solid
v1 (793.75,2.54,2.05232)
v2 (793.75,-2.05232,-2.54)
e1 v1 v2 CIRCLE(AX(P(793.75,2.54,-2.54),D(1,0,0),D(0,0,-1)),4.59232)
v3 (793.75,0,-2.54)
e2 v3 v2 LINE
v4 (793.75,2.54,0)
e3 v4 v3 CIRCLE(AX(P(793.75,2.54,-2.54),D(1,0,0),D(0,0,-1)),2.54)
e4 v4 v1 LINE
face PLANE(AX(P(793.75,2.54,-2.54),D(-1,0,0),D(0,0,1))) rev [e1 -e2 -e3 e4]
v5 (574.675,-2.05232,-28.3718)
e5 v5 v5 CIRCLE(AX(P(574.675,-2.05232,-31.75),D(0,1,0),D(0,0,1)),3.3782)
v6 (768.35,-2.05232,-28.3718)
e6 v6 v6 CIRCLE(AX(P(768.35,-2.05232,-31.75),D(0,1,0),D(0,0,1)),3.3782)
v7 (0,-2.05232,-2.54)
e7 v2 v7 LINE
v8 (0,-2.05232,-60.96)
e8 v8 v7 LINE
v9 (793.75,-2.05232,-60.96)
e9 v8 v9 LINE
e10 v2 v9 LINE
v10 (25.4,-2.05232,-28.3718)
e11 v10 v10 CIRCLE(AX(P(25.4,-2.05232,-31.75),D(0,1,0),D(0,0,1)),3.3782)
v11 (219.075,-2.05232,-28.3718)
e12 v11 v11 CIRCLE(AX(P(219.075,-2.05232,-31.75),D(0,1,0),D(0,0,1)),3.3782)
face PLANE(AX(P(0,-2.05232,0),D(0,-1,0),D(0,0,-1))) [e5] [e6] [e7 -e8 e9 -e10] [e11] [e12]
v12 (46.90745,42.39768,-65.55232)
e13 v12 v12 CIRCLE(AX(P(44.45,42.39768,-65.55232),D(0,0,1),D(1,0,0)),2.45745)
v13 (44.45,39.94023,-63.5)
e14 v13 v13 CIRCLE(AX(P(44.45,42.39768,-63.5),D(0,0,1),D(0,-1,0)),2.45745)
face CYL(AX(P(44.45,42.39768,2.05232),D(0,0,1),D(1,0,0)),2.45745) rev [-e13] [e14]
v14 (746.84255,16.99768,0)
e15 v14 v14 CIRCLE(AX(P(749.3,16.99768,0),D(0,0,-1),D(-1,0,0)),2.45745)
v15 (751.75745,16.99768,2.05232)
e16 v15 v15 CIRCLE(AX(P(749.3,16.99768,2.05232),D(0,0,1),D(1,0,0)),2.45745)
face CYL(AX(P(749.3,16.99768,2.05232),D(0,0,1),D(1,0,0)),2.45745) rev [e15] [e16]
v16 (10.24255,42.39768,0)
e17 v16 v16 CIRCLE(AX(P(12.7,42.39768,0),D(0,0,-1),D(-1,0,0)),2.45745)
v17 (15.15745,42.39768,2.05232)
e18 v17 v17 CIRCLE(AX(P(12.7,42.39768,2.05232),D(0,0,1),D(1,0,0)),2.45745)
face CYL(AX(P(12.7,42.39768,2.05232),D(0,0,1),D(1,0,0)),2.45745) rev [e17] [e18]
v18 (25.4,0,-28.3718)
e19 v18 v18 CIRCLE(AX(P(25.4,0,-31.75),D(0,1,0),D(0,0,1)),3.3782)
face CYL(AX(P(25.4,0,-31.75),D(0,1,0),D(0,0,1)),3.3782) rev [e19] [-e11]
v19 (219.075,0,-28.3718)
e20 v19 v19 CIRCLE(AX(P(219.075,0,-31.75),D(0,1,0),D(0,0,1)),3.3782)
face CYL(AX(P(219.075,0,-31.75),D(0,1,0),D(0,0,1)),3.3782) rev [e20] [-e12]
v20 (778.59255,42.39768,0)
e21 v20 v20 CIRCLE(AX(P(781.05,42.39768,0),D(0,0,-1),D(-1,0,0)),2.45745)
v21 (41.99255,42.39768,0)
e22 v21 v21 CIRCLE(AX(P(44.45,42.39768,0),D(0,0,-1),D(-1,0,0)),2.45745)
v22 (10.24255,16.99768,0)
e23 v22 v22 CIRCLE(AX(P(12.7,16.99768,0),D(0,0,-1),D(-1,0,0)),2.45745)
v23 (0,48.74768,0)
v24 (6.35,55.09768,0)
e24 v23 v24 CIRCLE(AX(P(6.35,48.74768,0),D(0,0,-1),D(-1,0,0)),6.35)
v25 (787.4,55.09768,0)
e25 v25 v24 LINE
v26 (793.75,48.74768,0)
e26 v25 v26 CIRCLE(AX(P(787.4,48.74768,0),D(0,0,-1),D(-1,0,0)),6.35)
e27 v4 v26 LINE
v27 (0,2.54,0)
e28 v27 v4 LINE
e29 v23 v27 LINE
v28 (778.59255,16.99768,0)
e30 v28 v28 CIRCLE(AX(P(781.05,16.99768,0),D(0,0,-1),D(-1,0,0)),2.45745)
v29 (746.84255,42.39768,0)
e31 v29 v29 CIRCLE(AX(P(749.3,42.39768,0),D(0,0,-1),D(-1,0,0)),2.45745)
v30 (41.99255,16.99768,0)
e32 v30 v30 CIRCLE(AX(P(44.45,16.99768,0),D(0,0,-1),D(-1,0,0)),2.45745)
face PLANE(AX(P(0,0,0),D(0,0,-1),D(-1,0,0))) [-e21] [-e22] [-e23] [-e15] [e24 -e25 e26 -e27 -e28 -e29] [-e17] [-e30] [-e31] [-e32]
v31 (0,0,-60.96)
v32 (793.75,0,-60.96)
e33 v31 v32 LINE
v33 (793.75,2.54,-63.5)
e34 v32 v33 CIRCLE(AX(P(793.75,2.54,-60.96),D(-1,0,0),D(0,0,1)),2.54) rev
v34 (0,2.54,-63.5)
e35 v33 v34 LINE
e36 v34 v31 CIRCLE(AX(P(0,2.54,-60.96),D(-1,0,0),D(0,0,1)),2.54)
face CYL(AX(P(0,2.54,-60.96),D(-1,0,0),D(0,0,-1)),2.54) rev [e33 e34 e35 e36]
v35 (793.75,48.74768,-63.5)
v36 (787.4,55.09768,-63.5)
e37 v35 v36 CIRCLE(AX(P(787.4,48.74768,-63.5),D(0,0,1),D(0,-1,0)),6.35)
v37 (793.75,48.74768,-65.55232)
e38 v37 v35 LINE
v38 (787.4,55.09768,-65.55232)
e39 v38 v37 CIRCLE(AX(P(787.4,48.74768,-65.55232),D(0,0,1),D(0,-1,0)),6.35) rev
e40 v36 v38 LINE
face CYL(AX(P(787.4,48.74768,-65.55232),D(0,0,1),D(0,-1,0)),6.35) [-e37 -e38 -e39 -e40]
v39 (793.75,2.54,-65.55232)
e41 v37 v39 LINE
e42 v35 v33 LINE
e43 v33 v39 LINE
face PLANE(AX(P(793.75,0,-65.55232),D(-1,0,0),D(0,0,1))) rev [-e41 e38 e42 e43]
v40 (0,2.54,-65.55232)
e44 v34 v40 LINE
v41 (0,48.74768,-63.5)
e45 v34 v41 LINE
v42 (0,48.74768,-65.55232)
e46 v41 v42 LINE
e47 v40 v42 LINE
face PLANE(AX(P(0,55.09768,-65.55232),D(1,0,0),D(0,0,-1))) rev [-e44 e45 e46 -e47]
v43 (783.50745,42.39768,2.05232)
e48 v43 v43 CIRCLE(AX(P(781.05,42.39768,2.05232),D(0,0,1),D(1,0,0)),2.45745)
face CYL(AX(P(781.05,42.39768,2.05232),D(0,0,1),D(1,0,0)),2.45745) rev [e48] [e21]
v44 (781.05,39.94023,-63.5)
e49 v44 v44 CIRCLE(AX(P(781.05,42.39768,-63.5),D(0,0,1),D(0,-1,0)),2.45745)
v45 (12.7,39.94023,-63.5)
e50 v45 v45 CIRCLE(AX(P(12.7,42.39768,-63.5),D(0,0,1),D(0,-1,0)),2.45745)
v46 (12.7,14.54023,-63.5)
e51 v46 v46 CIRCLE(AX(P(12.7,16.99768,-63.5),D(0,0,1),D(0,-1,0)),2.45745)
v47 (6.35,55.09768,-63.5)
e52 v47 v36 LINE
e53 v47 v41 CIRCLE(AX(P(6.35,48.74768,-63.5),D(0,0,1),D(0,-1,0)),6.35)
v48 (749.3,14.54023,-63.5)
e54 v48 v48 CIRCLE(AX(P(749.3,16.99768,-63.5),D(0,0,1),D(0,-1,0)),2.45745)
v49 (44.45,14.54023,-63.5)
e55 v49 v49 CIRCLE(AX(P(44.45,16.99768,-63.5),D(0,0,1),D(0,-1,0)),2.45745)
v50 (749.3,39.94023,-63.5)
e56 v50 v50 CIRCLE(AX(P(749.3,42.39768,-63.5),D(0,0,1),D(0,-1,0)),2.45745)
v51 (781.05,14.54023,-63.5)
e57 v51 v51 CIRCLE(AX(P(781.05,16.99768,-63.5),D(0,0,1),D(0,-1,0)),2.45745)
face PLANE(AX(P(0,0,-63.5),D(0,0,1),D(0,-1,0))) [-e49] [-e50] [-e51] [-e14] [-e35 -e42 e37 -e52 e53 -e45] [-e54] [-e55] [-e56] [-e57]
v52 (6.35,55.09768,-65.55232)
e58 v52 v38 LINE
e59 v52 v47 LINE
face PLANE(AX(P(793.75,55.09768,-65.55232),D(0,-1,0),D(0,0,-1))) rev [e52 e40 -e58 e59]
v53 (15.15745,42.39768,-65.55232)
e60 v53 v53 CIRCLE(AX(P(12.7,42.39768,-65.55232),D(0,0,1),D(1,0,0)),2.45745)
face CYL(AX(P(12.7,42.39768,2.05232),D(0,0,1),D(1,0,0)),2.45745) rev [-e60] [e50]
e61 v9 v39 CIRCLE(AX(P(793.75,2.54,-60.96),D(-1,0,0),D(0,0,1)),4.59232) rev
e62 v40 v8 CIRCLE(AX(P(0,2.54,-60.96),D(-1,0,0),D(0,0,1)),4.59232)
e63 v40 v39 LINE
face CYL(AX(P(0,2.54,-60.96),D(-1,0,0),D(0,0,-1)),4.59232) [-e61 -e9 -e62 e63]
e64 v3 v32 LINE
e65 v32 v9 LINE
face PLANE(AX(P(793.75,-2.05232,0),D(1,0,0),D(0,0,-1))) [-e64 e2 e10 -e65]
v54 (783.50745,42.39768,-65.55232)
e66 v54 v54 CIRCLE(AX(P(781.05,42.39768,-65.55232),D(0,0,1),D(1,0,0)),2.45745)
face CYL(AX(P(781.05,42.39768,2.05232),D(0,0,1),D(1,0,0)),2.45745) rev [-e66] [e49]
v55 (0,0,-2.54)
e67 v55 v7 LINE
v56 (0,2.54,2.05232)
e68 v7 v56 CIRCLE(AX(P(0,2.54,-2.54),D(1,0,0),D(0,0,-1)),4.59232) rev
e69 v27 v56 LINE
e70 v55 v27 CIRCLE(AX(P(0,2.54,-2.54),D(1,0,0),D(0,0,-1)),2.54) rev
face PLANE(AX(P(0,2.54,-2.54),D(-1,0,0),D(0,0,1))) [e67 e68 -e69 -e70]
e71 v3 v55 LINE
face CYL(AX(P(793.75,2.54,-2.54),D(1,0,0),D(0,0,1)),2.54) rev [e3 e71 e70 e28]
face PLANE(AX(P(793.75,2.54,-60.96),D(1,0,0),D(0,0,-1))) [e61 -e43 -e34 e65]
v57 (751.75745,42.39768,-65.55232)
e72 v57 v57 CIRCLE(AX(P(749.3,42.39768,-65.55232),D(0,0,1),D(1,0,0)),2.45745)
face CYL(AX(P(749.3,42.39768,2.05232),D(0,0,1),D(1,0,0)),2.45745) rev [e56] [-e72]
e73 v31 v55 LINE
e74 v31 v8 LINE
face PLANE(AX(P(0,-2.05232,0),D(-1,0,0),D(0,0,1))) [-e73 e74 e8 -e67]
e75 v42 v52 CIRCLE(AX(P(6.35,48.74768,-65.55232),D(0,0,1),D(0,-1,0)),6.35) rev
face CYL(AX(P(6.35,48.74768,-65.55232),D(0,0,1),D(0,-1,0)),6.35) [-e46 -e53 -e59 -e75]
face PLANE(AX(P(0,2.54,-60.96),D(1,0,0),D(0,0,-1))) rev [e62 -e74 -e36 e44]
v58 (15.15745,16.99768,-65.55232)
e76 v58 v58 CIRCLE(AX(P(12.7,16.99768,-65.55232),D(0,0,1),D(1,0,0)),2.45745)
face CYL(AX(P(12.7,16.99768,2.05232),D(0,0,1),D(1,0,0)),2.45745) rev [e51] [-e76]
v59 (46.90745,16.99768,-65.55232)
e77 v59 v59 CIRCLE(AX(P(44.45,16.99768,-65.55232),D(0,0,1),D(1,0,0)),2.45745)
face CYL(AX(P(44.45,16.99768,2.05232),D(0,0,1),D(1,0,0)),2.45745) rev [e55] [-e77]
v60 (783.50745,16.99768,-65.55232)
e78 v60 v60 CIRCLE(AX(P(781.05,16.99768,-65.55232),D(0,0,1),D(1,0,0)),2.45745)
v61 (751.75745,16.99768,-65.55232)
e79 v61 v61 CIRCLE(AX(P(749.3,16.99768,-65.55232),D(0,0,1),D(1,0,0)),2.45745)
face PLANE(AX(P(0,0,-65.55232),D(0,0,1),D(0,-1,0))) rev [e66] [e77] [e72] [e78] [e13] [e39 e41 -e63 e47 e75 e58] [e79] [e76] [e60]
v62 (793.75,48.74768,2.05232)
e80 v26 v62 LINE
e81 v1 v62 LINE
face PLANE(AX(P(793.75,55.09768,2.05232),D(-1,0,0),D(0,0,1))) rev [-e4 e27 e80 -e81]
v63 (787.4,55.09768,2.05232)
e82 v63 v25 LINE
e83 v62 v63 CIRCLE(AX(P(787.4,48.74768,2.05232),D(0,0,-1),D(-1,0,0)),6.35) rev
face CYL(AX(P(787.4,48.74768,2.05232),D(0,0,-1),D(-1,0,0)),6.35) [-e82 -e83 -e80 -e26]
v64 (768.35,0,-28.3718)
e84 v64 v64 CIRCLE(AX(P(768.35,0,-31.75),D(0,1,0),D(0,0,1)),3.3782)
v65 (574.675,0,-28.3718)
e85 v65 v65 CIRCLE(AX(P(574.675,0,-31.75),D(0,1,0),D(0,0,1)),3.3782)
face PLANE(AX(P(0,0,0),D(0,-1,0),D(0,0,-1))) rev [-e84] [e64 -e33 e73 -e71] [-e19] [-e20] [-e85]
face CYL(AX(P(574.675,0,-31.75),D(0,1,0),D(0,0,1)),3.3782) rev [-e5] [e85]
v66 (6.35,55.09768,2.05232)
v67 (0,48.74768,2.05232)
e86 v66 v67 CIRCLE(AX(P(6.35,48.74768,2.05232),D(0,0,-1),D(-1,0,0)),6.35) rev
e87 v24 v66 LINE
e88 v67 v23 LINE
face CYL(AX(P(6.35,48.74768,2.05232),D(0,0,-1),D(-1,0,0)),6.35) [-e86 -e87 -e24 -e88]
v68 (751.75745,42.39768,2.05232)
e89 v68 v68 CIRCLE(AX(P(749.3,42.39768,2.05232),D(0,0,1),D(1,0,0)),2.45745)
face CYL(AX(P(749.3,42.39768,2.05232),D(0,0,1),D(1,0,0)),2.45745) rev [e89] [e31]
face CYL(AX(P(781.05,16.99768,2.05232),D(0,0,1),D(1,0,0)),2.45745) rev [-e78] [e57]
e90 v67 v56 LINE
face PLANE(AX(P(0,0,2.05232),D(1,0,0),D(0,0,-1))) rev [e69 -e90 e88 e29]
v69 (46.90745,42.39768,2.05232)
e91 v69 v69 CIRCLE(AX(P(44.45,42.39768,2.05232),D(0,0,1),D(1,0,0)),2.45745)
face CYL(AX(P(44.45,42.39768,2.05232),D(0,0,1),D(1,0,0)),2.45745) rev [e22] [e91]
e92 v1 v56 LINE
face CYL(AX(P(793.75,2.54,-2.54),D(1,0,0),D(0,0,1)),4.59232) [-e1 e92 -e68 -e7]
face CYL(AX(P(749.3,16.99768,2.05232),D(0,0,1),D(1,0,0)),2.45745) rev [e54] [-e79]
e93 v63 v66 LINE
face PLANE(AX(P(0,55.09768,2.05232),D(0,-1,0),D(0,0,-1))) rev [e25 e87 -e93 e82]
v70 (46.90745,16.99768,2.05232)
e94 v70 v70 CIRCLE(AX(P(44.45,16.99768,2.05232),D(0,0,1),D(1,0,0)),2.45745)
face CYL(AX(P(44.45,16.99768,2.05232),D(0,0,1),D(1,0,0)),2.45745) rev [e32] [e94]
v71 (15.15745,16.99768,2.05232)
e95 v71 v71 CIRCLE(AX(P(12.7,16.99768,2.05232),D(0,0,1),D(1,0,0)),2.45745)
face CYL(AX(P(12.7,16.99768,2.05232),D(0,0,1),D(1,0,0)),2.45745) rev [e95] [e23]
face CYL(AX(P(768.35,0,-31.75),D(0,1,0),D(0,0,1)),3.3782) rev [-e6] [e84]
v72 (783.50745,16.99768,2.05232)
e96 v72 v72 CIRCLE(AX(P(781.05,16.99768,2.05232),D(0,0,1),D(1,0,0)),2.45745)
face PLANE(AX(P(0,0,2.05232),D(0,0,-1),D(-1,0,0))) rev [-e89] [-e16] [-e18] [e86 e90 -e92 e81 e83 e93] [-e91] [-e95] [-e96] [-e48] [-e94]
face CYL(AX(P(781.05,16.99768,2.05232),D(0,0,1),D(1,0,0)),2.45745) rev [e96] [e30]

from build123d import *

# Parameters (mm, degrees)
SKETCH1_W                      = 793.75
SKETCH1_H                      = 63.5
BASE_FLANGE1_DEPTH             = 2.05232
EDGE_FLANGE1_STRIP_W           = 13.28928
EDGE_FLANGE1_STRIP_H           = 2.05232
EDGE_FLANGE1_STRIP_CUT_DEPTH   = 793.75
EDGE_FLANGE1_STRIP_2_W         = 13.28928
EDGE_FLANGE1_STRIP_2_H         = 2.05232
EDGE_FLANGE1_STRIP_CUT_2_DEPTH = 793.75
EDGE_FLANGE1_DEPTH             = 793.75
EDGE_FLANGE1_BEND_DEPTH        = 793.75
F_10_0_1935_DIAMETER_HOLE1_D   = 4.9149
BREAK_CORNER1_START            = -65.55232
BREAK_CORNER1_DEPTH            = 67.60464
F_1_4_CLEARANCE_HOLE1_D        = 6.7564


# Read off the part's stored shape, not the designer's step: Break-Corner1
# Sheet-metal steps are written as plain solids
with BuildPart() as part:
    # Sketch1 → Base-Flange1 (new body)
    with BuildSketch(Plane(origin=(0, 0, 0), x_dir=(1, 0, 0), z_dir=(0, 1, 0))):
        with Locations((396.875, 31.75)):
            Rectangle(SKETCH1_W, SKETCH1_H)
    extrude(amount=-BASE_FLANGE1_DEPTH)

    # Edge-Flange1 strip (across the edge) → Edge-Flange1 strip cut (cut)
    with BuildSketch(Plane(origin=(0, 0, 0), x_dir=(0, 0, -1), z_dir=(1, 0, 0))):
        with Locations((-4.10464, -1.02616)):
            Rectangle(EDGE_FLANGE1_STRIP_W, EDGE_FLANGE1_STRIP_H)
    extrude(amount=EDGE_FLANGE1_STRIP_CUT_DEPTH, mode=Mode.SUBTRACT)

    # Edge-Flange1 strip 2 (across the edge) → Edge-Flange1 strip cut 2 (cut)
    with BuildSketch(Plane(origin=(793.75, 0, -63.5), x_dir=(0, 0, 1), z_dir=(-1, 0, 0))):
        with Locations((-4.10464, -1.02616)):
            Rectangle(EDGE_FLANGE1_STRIP_2_W, EDGE_FLANGE1_STRIP_2_H)
    extrude(amount=EDGE_FLANGE1_STRIP_CUT_2_DEPTH, mode=Mode.SUBTRACT)

    # Edge-Flange1 section (across the edge) → Edge-Flange1 (add)
    with BuildSketch(Plane(origin=(0, 0, 0), x_dir=(0, 0, -1), z_dir=(1, 0, 0))):
        with BuildLine():
            Line((-2.05232, 2.54), (-2.05232, 55.09768))
            Line((-2.05232, 55.09768), (0, 55.09768))
            Line((0, 55.09768), (0, 2.54))
            ThreePointArc((0, 2.54), (0.743948776, 0.743948776), (2.54, 0))
            Line((2.54, 0), (2.54, -2.05232))
            ThreePointArc((2.54, -2.05232), (-0.707260613, -0.707260613), (-2.05232, 2.54))
        make_face()
    extrude(amount=EDGE_FLANGE1_DEPTH)

    # Edge-Flange1 section 2 (across the edge) → Edge-Flange1 bend (add)
    with BuildSketch(Plane(origin=(793.75, 0, -63.5), x_dir=(0, 0, 1), z_dir=(-1, 0, 0))):
        with BuildLine():
            Line((-2.05232, 2.54), (-2.05232, 55.09768))
            Line((-2.05232, 55.09768), (0, 55.09768))
            Line((0, 55.09768), (0, 2.54))
            ThreePointArc((0, 2.54), (0.743948776, 0.743948776), (2.54, 0))
            Line((2.54, 0), (2.54, -2.05232))
            ThreePointArc((2.54, -2.05232), (-0.707260613, -0.707260613), (-2.05232, 2.54))
        make_face()
    extrude(amount=EDGE_FLANGE1_BEND_DEPTH)

    # #10 (0.1935) Diameter Hole1 (through all)
    with Locations(Plane.XY.offset(2.05232)):
        with Locations((12.7, 42.39768), (12.7, 16.99768), (44.45, 42.39768), (44.45, 16.99768), (749.3, 16.99768), (781.05, 16.99768), (781.05, 42.39768), (749.3, 42.39768)):
            Hole(F_10_0_1935_DIAMETER_HOLE1_D / 2)

    # Break-Corner1 outline → Break-Corner1 (cut)
    with BuildSketch(Plane.XY.offset(BREAK_CORNER1_START)):
        with BuildLine():
            ThreePointArc((0, 48.74768), (1.859871939, 53.237808061), (6.35, 55.09768))
            Line((6.35, 55.09768), (0, 55.09768))
            Line((0, 55.09768), (0, 48.74768))
        make_face()
        with BuildLine():
            ThreePointArc((787.4, 55.09768), (791.890128061, 53.237808061), (793.75, 48.74768))
            Line((793.75, 48.74768), (793.75, 55.09768))
            Line((793.75, 55.09768), (787.4, 55.09768))
        make_face()
    extrude(amount=BREAK_CORNER1_DEPTH, mode=Mode.SUBTRACT)

    # 1/4 Clearance Hole1 (through all)
    with Locations(Plane(origin=(0, 0, 0), x_dir=(1, 0, 0), z_dir=(0, 1, 0))):
        with Locations((219.075, 31.75), (574.675, 31.75), (25.4, 31.75), (768.35, 31.75)):
            Hole(F_1_4_CLEARANCE_HOLE1_D / 2)


solid = part.part
